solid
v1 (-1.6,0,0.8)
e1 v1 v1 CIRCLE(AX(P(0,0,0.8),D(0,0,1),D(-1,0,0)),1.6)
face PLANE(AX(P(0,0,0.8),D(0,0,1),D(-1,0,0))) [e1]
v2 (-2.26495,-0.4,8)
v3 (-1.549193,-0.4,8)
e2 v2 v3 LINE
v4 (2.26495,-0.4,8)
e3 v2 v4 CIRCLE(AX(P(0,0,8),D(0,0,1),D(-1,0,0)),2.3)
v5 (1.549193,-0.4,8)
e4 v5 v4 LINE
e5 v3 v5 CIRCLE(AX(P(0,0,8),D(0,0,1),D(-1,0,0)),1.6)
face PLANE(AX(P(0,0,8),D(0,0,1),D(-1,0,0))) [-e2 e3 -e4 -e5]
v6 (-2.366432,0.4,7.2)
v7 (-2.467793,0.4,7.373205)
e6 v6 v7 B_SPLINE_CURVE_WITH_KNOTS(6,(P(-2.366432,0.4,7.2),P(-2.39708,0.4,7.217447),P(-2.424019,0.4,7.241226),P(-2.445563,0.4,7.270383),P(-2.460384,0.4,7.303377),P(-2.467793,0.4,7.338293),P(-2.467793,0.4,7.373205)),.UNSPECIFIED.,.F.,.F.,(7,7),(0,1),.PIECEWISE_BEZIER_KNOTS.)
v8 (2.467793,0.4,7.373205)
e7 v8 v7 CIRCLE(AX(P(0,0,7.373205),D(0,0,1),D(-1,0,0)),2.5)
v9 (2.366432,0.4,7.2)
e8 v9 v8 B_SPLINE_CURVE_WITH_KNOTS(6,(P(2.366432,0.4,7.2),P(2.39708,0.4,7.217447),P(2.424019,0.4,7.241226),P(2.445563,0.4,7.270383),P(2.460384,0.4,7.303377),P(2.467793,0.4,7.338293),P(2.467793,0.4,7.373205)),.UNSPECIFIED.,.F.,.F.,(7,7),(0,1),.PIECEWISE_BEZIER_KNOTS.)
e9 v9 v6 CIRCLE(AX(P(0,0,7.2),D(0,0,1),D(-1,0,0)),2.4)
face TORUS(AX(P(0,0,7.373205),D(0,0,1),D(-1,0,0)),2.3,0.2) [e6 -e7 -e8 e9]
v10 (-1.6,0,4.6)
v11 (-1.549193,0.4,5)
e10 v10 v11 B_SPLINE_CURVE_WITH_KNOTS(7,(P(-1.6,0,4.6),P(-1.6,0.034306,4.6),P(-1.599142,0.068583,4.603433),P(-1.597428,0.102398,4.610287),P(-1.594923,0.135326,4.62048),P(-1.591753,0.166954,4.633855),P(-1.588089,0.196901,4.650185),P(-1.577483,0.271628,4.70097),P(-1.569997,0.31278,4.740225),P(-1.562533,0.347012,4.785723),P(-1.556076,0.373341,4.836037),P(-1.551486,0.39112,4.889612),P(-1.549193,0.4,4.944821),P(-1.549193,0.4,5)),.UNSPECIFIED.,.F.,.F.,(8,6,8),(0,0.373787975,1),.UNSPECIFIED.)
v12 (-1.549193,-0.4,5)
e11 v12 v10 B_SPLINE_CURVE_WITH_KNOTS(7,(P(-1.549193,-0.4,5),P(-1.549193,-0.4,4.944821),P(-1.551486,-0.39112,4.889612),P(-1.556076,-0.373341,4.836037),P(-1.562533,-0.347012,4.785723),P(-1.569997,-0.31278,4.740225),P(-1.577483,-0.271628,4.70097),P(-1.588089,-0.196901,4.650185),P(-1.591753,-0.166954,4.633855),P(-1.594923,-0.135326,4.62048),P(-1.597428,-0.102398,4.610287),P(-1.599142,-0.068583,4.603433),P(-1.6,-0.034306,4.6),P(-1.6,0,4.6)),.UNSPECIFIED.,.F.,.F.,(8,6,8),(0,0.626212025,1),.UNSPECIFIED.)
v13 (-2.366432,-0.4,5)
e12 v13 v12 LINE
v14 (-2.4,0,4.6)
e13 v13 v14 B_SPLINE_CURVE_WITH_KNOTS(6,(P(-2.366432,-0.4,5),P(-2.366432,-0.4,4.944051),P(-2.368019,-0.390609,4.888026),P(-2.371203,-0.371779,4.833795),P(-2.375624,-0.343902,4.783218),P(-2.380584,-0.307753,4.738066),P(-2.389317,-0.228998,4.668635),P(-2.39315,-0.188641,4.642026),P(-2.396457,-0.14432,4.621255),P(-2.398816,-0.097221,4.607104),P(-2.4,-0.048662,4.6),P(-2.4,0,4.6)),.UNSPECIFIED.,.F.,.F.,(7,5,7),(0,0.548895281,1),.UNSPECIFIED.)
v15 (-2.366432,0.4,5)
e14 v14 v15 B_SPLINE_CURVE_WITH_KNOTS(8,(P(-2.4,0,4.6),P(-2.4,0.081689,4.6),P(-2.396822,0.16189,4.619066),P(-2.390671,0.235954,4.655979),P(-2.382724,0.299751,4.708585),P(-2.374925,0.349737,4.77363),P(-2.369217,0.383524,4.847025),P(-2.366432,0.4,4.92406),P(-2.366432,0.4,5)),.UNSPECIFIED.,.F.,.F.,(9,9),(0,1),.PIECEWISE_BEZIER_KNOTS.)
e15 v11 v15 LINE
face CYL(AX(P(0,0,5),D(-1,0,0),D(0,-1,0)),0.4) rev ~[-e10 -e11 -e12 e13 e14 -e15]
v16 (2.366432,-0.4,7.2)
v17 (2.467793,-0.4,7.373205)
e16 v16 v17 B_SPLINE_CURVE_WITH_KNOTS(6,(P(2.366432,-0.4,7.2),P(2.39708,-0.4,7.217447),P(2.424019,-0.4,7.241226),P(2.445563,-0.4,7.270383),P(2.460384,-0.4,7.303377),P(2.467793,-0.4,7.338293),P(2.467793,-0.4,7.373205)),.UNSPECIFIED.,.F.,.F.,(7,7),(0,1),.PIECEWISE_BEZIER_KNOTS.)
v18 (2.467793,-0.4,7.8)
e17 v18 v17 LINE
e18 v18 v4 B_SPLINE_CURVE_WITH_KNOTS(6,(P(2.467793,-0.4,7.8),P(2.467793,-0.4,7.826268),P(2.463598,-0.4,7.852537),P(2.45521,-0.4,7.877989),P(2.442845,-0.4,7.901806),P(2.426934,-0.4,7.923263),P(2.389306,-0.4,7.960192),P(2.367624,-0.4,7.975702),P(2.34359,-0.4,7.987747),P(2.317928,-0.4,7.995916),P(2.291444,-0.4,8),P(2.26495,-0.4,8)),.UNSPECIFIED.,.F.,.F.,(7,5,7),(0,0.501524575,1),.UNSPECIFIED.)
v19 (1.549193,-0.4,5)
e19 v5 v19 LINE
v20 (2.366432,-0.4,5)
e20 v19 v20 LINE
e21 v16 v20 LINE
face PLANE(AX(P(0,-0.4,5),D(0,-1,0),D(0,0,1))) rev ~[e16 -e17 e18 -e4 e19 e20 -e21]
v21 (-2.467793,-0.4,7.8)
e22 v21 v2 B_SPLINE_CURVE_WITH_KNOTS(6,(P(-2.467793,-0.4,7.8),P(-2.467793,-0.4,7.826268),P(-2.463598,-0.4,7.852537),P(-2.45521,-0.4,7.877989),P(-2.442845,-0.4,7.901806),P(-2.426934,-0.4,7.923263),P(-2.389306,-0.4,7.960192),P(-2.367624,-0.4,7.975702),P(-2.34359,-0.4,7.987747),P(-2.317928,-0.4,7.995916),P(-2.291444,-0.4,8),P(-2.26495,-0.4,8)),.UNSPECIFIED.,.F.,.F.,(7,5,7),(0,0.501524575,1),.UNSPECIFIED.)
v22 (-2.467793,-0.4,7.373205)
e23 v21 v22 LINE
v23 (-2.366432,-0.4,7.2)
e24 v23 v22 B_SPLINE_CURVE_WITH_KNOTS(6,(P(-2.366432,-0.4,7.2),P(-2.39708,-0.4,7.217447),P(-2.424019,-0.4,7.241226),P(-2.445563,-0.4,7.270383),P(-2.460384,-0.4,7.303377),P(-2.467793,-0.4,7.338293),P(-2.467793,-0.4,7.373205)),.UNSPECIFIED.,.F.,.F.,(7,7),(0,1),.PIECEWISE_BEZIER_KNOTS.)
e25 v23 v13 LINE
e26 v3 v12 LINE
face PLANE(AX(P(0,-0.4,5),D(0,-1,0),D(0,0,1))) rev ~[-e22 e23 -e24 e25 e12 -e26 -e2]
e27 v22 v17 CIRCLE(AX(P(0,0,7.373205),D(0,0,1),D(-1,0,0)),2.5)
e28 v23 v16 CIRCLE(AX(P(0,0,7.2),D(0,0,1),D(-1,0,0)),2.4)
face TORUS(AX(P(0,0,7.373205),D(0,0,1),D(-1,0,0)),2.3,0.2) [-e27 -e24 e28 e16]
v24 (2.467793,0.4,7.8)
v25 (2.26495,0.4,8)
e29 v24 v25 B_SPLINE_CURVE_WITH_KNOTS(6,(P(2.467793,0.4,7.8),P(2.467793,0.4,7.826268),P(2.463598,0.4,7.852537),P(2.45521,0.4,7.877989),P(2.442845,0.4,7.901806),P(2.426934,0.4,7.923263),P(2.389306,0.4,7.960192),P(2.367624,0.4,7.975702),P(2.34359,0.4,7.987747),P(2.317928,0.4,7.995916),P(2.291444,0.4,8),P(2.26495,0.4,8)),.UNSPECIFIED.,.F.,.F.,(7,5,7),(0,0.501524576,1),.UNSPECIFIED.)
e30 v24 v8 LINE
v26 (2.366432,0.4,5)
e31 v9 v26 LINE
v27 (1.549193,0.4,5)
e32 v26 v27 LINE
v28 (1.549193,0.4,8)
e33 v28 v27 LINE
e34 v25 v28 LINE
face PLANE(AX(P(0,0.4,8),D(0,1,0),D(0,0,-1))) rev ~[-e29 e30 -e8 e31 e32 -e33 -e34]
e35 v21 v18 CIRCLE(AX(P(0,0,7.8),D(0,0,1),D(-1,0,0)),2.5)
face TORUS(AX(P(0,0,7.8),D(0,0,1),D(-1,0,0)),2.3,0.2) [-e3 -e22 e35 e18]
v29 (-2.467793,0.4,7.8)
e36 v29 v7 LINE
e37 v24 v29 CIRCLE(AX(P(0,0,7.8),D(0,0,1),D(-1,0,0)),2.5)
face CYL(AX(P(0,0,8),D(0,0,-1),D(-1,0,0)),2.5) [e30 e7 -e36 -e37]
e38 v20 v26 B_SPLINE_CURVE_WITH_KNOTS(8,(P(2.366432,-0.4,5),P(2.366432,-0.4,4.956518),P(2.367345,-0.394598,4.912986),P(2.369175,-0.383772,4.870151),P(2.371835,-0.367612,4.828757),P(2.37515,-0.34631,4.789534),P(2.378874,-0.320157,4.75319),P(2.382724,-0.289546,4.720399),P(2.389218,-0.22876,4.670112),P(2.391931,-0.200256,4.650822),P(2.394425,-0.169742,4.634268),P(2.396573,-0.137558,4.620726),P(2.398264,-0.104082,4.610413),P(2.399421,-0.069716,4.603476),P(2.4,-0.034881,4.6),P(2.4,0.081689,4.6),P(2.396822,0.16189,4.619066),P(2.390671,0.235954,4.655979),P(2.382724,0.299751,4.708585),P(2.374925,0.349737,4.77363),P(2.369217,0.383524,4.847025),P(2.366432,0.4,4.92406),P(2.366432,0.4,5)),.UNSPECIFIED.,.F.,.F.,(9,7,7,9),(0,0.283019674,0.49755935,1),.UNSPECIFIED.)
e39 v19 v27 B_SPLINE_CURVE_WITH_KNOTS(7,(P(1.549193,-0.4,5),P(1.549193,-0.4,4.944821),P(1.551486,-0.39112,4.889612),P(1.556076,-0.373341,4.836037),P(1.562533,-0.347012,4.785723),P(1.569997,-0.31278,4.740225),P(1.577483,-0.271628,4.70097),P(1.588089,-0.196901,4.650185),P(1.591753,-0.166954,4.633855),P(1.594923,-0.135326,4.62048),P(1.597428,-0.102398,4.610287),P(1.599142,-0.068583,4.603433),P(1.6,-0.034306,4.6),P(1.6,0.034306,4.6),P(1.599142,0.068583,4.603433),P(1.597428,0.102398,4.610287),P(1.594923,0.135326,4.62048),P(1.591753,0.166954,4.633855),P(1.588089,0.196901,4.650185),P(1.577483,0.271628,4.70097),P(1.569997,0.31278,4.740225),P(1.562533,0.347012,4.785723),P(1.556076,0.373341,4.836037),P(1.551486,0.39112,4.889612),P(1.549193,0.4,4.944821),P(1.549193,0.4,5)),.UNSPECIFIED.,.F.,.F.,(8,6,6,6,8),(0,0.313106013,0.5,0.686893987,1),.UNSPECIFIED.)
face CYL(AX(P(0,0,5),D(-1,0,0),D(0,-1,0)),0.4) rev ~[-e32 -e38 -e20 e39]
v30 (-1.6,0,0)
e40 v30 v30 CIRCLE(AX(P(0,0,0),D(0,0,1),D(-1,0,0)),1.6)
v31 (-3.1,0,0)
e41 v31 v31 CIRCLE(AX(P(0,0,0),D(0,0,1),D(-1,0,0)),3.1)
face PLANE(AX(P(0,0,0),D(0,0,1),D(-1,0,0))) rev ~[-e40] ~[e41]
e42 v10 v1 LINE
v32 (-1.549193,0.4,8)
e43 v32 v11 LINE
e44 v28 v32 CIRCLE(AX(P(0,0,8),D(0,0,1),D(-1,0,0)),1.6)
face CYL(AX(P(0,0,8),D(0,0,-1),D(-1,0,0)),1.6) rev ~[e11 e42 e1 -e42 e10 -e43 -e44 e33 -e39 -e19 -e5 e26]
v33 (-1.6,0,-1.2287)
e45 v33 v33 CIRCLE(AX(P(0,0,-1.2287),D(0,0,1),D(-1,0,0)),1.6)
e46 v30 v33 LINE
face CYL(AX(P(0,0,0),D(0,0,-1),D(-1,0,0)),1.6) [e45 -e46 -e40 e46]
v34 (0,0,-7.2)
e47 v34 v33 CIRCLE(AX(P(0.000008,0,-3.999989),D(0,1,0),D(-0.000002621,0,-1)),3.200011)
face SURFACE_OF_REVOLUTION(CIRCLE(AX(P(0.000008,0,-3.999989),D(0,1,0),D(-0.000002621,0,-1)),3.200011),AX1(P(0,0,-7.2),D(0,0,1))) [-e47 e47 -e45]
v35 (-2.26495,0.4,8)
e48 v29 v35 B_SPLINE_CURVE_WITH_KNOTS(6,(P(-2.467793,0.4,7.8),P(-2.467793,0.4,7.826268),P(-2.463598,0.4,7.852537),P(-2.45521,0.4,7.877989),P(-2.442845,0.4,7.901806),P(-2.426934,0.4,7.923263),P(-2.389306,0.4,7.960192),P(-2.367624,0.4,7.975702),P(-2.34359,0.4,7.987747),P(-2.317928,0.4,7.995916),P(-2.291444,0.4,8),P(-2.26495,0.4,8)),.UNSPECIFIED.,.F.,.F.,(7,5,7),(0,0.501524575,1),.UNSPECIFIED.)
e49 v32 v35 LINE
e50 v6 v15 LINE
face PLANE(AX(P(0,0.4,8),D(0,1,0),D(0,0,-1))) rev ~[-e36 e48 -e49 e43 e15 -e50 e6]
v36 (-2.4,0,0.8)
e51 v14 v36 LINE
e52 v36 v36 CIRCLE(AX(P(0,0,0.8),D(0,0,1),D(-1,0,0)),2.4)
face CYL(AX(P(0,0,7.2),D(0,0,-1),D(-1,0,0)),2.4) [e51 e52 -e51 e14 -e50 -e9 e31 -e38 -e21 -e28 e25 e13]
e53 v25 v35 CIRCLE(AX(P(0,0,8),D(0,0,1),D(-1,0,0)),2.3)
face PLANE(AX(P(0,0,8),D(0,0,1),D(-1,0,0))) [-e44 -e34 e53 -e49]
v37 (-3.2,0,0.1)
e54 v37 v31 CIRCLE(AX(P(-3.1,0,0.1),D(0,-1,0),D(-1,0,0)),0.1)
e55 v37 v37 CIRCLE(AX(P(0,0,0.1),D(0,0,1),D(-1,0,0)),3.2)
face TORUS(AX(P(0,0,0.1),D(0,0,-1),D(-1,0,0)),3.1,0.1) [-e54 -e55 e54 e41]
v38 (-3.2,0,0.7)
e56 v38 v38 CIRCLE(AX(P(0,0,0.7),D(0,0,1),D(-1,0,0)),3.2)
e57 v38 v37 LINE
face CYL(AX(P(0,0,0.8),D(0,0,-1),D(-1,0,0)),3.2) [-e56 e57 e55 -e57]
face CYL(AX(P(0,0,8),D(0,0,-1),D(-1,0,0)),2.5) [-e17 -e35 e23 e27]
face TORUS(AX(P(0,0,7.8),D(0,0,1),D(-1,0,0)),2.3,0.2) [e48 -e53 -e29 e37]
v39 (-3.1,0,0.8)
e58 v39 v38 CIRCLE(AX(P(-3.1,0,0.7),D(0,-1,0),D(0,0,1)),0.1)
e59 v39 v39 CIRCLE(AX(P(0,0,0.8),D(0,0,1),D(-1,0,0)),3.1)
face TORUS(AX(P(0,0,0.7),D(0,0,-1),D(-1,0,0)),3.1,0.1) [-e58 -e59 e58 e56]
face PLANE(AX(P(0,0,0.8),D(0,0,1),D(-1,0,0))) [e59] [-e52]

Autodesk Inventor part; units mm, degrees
ref_plane "YZ Plane" through (0, 0, 0) normal (1, 0, 0) x (0, 1, 0)
ref_plane "XZ Plane" through (0, 0, 0) normal (0, 1, 0) x (-1, 0, 0)
ref_plane "XY Plane" through (0, 0, 0) normal (0, 0, 1) x (1, 0, 0)
sketch "Sketch1" plane through (0, 0, 0) normal (0, 1, 0) x (-1, 0, 0)
  line L0 (2.4, 7.2) -> (2.4, 0.8)
  line L1 (3.2, 0.8) -> (2.4, 0.8)
  line L2 (3.2, 0.8) -> (3.2, 0)
  line L3 (2.5, 8) -> (2.5, 7.2)
  line L4 (2.5, 8) -> (1.6, 8)
  line L5 (0, -10.9766) -> (0, 11.1628) projected
  line L6 (2.4, 7.2) -> (2.5, 7.2)
  line L7 (1.6, 8) -> (1.6, 0.8)
  line L8 (4.6692, 0) -> (-0.7782, 0) projected
  line L9 (1.6, 0.8) -> (0, 0.8)
  line L10 (0, -7.2) -> (0, 0.8)
  line L11 (3.2, 0) -> (1.6, 0)
  line L12 (1.6, 0) -> (1.6, -1.2287)
  arc A0 (0, -7.2) -> (1.6, -1.2287) centre (0, -4) ccw
  point P0 (0, 0)
  dimension "d1" = 4.8
  dimension "d2" = 5
  dimension "d6" = 8
  dimension "d7" = 0.8
  dimension "d8" = 6.4
  dimension "d9" = 0.8
  dimension "d32" = 6.4
  dimension "d33" = 4
  dimension "d34" = 3.2
  dimension "d37" = 3.2
revolve "Revolution1" add sketch "Sketch1" angle 360 about axis through (0, 0, -10) along (0, 0, 1)
fillet "Fillet1" radius 0.2 2 edges at (2.5, 0, 8) (2.5, 0, 7.2)
fillet "Fillet1" radius 0.1 2 edges at (3.2, 0, 0) (3.2, 0, 0.8)
sketch "Sketch2" plane through (0, 0, 0) normal (1, 0, 0) x (0, 1, 0)
  line L0 (-1.6, 8) -> (1.6, 8) projected
  line L1 (-0.4, 8) -> (0.4, 8)
  line L2 (0.4, 8) -> (0.4, 5)
  line L3 (-0.4, 5) -> (-0.4, 8)
  arc A0 (-0.4, 5) -> (0.4, 5) centre (0, 5) ccw
  point P0 (0, 0)
  point P1 (0, 8)
  dimension "d35" = 3.4
  dimension "d36" = 0.8
extrude "Extrusion2" cut sketch "Sketch2" along normal through all both and the other way through all
equation "\"d1\" = tpd"
equation "\"d2\" = tpcd"
equation "\"d6\" = d19"
equation "\"d7\" = d9"
equation "\"d8\" = tsd"
equation "\"d9\" = tsl"
equation "\"d33\" = 0.5 * lu"
equation "\"d34\" = 0.333333 * lh"
equation "\"d37\" = rd"
equation "\"d27\" = pinf"
equation "\"d28\" = lf"
equation "\"d35\" = tpnl"
equation "\"d36\" = tpnw"
equation "\"tpd\" = 4.8"
equation "\"tpcd\" = 5"
equation "\"d19\" = 8"
equation "\"tsd\" = 6.4"
equation "\"tsl\" = 0.8"
equation "\"lu\" = 8"
equation "\"lh\" = 9.6"
equation "\"rd\" = 3.2"
equation "\"pinf\" = 0.2"
equation "\"lf\" = 0.1"
equation "\"tpnl\" = 3.4"
equation "\"tpnw\" = 0.8"
properties part number "6628-Red" material "ABS Plastic"
